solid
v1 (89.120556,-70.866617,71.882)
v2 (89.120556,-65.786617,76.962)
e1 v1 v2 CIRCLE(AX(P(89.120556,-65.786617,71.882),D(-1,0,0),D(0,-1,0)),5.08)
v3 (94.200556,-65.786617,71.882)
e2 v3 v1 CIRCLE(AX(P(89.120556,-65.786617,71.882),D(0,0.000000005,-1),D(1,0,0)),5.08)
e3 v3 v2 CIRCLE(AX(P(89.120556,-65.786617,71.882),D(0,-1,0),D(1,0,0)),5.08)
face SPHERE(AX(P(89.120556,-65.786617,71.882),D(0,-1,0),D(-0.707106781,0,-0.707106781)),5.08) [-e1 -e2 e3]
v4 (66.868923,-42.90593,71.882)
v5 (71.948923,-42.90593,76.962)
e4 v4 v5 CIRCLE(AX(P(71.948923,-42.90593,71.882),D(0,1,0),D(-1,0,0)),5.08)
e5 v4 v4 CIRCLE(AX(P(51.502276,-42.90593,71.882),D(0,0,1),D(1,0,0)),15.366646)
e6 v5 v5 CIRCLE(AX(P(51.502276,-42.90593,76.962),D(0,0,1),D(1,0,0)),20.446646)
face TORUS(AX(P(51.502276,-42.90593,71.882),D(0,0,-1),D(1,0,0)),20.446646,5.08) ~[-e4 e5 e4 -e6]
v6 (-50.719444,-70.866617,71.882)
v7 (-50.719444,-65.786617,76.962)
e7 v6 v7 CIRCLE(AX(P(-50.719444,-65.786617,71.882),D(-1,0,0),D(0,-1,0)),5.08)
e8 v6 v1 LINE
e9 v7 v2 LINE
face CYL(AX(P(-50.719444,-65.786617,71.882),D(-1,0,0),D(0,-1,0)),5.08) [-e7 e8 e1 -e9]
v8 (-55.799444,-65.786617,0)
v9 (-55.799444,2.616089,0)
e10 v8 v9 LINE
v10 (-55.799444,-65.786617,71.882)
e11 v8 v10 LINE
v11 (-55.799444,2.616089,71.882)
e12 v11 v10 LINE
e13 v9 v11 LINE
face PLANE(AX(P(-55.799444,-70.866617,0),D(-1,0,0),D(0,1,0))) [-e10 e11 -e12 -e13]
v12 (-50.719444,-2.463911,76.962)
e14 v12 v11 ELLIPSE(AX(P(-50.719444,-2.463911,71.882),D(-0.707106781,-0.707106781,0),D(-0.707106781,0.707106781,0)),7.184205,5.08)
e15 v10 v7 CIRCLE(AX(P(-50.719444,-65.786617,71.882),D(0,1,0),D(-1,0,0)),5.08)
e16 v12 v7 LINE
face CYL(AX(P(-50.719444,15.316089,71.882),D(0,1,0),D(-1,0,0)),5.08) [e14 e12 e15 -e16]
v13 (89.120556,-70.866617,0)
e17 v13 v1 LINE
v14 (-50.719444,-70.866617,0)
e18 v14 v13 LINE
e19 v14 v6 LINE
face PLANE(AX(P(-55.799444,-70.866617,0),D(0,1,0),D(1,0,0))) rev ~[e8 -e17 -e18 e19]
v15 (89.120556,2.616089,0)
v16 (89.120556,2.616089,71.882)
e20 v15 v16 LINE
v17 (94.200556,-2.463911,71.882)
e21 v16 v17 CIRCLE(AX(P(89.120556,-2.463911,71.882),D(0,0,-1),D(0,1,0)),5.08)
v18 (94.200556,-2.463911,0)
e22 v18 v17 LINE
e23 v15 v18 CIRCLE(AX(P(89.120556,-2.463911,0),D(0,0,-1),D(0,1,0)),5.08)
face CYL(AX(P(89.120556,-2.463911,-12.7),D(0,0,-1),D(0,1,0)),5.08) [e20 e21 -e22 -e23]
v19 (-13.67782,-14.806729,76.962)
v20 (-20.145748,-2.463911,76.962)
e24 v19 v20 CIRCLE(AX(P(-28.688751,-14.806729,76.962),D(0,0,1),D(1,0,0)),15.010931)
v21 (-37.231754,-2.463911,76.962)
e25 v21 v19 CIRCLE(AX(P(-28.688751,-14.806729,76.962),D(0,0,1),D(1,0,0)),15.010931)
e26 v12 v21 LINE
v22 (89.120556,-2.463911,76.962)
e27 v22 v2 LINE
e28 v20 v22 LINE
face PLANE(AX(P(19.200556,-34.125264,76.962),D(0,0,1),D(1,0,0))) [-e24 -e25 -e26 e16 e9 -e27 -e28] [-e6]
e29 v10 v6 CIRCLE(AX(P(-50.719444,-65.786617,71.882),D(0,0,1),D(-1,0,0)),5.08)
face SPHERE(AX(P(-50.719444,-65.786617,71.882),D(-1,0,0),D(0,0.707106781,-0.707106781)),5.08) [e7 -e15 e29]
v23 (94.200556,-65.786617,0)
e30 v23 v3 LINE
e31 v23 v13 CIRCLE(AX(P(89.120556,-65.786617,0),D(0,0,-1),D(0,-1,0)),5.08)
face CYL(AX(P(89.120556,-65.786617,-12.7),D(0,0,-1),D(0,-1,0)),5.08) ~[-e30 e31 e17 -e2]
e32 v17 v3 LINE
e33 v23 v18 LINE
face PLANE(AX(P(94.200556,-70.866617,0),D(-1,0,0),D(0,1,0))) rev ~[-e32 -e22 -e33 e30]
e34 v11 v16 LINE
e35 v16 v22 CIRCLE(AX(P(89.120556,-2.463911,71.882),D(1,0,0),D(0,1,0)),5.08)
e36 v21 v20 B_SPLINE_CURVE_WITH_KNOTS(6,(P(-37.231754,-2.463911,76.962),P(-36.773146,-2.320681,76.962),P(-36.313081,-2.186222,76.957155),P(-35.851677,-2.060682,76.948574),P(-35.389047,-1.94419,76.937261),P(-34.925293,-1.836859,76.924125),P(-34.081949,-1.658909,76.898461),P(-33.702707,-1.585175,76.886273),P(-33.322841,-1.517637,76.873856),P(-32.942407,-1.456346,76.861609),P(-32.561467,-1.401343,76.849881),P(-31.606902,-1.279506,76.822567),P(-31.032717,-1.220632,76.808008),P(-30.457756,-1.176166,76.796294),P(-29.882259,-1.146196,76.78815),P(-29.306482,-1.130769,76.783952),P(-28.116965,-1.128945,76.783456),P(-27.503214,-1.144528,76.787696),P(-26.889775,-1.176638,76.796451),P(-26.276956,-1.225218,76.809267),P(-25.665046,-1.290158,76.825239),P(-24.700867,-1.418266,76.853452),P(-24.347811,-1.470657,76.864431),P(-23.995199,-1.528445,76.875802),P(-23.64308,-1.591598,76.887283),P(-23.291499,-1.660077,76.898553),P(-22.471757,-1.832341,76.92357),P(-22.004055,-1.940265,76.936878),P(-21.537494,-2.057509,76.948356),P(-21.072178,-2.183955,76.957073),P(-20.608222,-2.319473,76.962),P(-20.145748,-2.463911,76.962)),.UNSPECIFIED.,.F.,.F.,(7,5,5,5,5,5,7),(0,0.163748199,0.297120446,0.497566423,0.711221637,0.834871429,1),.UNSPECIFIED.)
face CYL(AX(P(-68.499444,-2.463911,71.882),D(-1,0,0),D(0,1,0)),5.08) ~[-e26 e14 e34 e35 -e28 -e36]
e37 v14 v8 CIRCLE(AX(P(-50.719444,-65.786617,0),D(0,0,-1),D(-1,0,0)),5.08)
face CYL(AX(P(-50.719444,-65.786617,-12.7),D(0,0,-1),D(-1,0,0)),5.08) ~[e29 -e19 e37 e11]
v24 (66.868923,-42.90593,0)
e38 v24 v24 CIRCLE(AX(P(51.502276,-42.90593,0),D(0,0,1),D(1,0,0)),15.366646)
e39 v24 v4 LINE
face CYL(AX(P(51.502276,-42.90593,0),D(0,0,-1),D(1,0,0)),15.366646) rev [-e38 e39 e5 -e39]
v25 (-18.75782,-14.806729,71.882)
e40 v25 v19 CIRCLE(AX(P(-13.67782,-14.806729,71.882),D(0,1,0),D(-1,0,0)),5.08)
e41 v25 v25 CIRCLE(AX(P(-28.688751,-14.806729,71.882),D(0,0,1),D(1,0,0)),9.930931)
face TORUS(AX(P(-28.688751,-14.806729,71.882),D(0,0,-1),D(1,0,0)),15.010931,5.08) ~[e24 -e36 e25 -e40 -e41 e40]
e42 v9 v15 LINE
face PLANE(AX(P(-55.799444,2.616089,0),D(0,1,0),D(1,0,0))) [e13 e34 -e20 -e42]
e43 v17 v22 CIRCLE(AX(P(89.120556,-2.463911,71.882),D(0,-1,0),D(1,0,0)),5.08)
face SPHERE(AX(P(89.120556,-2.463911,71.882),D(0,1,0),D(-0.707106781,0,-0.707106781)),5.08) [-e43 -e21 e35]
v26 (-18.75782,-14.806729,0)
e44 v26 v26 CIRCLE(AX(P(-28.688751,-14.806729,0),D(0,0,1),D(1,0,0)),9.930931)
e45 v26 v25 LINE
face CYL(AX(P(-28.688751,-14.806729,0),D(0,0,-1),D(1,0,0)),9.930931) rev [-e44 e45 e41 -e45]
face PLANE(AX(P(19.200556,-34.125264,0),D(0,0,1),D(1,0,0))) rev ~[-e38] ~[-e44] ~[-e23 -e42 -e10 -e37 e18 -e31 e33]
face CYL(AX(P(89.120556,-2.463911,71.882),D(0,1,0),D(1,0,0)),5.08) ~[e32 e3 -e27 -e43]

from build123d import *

# Parameters (mm, degrees)
F0_W         = 150
F0_H         = 73.4827055006
F0_R         = 15.3666463422
F0_R_2       = 9.9309311283
F1_DEPTH     = 76.962
F2_T1_DEPTH  = 139.84
F2_T3_DEPTH  = 63.3227055006
F2_T5_DEPTH  = 157.62
F2_T7_DEPTH  = 81.1027055006
F2_T9_DEPTH  = 84.582
F2_S13_W     = 5.08
F2_S13_H     = 5.08
F2_T14_DEPTH = 5.08
F2_S19_W     = 5.08
F2_S19_H     = 5.08
F2_T20_DEPTH = 5.08
F2_S25_W     = 5.08
F2_S25_H     = 5.08
F2_T26_DEPTH = 5.08


# Not quite as in the source:
# - a fillet or chamfer that OpenCascade refuses, or shapes differently, is made with other operations: its cross-section is extruded or revolved along the edge and cut away or added


with BuildPart() as f1:
    # F0 (on Top) → F1 (new body)
    with BuildSketch(Plane.XY):
        with Locations((19.2005559802, -34.1252638027)):
            Rectangle(F0_W, F0_H)
        with Locations((51.502276212, -42.9059304297)):
            Circle(F0_R, mode=Mode.SUBTRACT)
        with Locations((-28.6887511611, -14.8067288101)):
            Circle(F0_R_2, mode=Mode.SUBTRACT)
    extrude(amount=F1_DEPTH)

    # F2: fillet of radius 5.08 on 9 edges, made by hand

    # F2_s2 → F2_t1 (cut)
    with BuildSketch(Plane.YZ.offset(-50.7194440198)):
        with BuildLine():
            ThreePointArc((-70.866616553, 71.882), (-69.3787190014, 75.4741024484), (-65.786616553, 76.962))
            Line((-65.786616553, 76.962), (-70.866616553, 76.962))
            Line((-70.866616553, 76.962), (-70.866616553, 71.882))
        make_face()
    extrude(amount=F2_T1_DEPTH, mode=Mode.SUBTRACT)

    # F2_s4 → F2_t3 (cut)
    with BuildSketch(Plane.XZ.offset(2.4639110524)):
        with BuildLine():
            ThreePointArc((94.2005559802, 71.882), (92.7126584286, 75.4741024484), (89.1205559802, 76.962))
            Line((89.1205559802, 76.962), (94.2005559802, 76.962))
            Line((94.2005559802, 76.962), (94.2005559802, 71.882))
        make_face()
    extrude(amount=F2_T3_DEPTH, mode=Mode.SUBTRACT)

    # F2_s6 → F2_t5 (cut)
    with BuildSketch(Plane.YZ.offset(-68.4994440198)):
        with BuildLine():
            ThreePointArc((2.6160889476, 71.882), (1.128191396, 75.4741024484), (-2.4639110524, 76.962))
            Line((-2.4639110524, 76.962), (2.6160889476, 76.962))
            Line((2.6160889476, 76.962), (2.6160889476, 71.882))
        make_face()
    extrude(amount=F2_T5_DEPTH, mode=Mode.SUBTRACT)

    # F2_s8 → F2_t7 (cut)
    with BuildSketch(Plane.XZ.offset(-15.3160889476)):
        with BuildLine():
            ThreePointArc((-55.7994440198, 71.882), (-54.3115464682, 75.4741024484), (-50.7194440198, 76.962))
            Line((-50.7194440198, 76.962), (-55.7994440198, 76.962))
            Line((-55.7994440198, 76.962), (-55.7994440198, 71.882))
        make_face()
    extrude(amount=F2_T7_DEPTH, mode=Mode.SUBTRACT)

    # F2_s10 → F2_t9 (cut)
    with BuildSketch(Plane.XY.offset(-12.7)):
        with BuildLine():
            ThreePointArc((89.1205559802, -70.866616553), (92.7126584286, -69.3787190014), (94.2005559802, -65.786616553))
            Line((94.2005559802, -65.786616553), (94.2005559802, -70.866616553))
            Line((94.2005559802, -70.866616553), (89.1205559802, -70.866616553))
        make_face()
        with BuildLine():
            ThreePointArc((89.1205559802, 2.6160889476), (92.7126584286, 1.128191396), (94.2005559802, -2.4639110524))
            Line((94.2005559802, -2.4639110524), (94.2005559802, 2.6160889476))
            Line((94.2005559802, 2.6160889476), (89.1205559802, 2.6160889476))
        make_face()
        with BuildLine():
            ThreePointArc((-55.7994440198, -65.786616553), (-54.3115464682, -69.3787190014), (-50.7194440198, -70.866616553))
            Line((-50.7194440198, -70.866616553), (-55.7994440198, -70.866616553))
            Line((-55.7994440198, -70.866616553), (-55.7994440198, -65.786616553))
        make_face()
    extrude(amount=F2_T9_DEPTH, mode=Mode.SUBTRACT)


with BuildPart() as f2_tool12:
    # F2_s13 → F2_t14 (new body)
    with BuildSketch(Plane.YZ.offset(-50.7194440198)):
        with Locations((-68.326616553, 74.422)):
            Rectangle(F2_S13_W, F2_S13_H)
    extrude(amount=-F2_T14_DEPTH)

    # F2_s15 → F2_t16 (revolve, cut)
    with BuildSketch(Plane(origin=(-50.7194440198, -65.786616553, 71.882), x_dir=(0, 0.7071067812, -0.7071067812), z_dir=(0, 0.7071067812, 0.7071067812))):
        with BuildLine():
            ThreePointArc((0, -5.08), (5.08, 0), (0, 5.08))
            Line((0, 5.08), (0, -5.08))
        make_face()
    revolve(axis=Axis((-50.7194440198, -65.786616553, 71.882), (-1, 0, 0)), mode=Mode.SUBTRACT)


with BuildPart() as f1_1:
    add(f1.part)

    # F2_t11: cut F2_tool12
    add(f2_tool12.part, mode=Mode.SUBTRACT)


with BuildPart() as f2_tool18:
    # F2_s19 → F2_t20 (new body)
    with BuildSketch(Plane.XZ.offset(65.786616553)):
        with Locations((91.6605559802, 74.422)):
            Rectangle(F2_S19_W, F2_S19_H)
    extrude(amount=F2_T20_DEPTH)

    # F2_s21 → F2_t22 (revolve, cut)
    with BuildSketch(Plane(origin=(89.1205559802, -65.786616553, 71.882), x_dir=(-0.7071067812, 0, -0.7071067812), z_dir=(-0.7071067812, 0, 0.7071067812))):
        with BuildLine():
            ThreePointArc((0, -5.08), (5.08, 0), (0, 5.08))
            Line((0, 5.08), (0, -5.08))
        make_face()
    revolve(axis=Axis((89.1205559802, -65.786616553, 71.882), (0, -1, 0)), mode=Mode.SUBTRACT)


with BuildPart() as f1_2:
    add(f1_1.part)

    # F2_t17: cut F2_tool18
    add(f2_tool18.part, mode=Mode.SUBTRACT)


with BuildPart() as f2_tool24:
    # F2_s25 → F2_t26 (new body)
    with BuildSketch(Plane.XZ.offset(2.4639110524)):
        with Locations((91.6605559802, 74.422)):
            Rectangle(F2_S25_W, F2_S25_H)
    extrude(amount=-F2_T26_DEPTH)

    # F2_s27 → F2_t28 (revolve, cut)
    with BuildSketch(Plane(origin=(89.1205559802, -2.4639110524, 71.882), x_dir=(-0.7071067812, 0, -0.7071067812), z_dir=(0.7071067812, 0, -0.7071067812))):
        with BuildLine():
            ThreePointArc((0, -5.08), (5.08, 0), (0, 5.08))
            Line((0, 5.08), (0, -5.08))
        make_face()
    revolve(axis=Axis((89.1205559802, -2.4639110524, 71.882), (0, 1, 0)), mode=Mode.SUBTRACT)


with BuildPart() as f1_3:
    add(f1_2.part)

    # F2_t23: cut F2_tool24
    add(f2_tool24.part, mode=Mode.SUBTRACT)

    # F2_s29 → F2_t30 (revolve, cut)
    with BuildSketch(Plane.XZ.offset(42.9059304297)):
        with BuildLine():
            ThreePointArc((66.8689225542, 71.882), (68.3568201058, 75.4741024484), (71.9489225542, 76.962))
            Line((71.9489225542, 76.962), (66.8689225542, 76.962))
            Line((66.8689225542, 76.962), (66.8689225542, 71.882))
        make_face()
    revolve(axis=Axis((51.502276212, -42.9059304297, 76.962), (0, 0, 1)), mode=Mode.SUBTRACT)

    # F2_s31 → F2_t32 (revolve, cut)
    with BuildSketch(Plane.XZ.offset(14.8067288101)):
        with BuildLine():
            ThreePointArc((-18.7578200328, 71.882), (-17.2699224813, 75.4741024484), (-13.6778200328, 76.962))
            Line((-13.6778200328, 76.962), (-18.7578200328, 76.962))
            Line((-18.7578200328, 76.962), (-18.7578200328, 71.882))
        make_face()
    revolve(axis=Axis((-28.6887511611, -14.8067288101, 76.962), (0, 0, 1)), mode=Mode.SUBTRACT)


solid = f1_3.part
